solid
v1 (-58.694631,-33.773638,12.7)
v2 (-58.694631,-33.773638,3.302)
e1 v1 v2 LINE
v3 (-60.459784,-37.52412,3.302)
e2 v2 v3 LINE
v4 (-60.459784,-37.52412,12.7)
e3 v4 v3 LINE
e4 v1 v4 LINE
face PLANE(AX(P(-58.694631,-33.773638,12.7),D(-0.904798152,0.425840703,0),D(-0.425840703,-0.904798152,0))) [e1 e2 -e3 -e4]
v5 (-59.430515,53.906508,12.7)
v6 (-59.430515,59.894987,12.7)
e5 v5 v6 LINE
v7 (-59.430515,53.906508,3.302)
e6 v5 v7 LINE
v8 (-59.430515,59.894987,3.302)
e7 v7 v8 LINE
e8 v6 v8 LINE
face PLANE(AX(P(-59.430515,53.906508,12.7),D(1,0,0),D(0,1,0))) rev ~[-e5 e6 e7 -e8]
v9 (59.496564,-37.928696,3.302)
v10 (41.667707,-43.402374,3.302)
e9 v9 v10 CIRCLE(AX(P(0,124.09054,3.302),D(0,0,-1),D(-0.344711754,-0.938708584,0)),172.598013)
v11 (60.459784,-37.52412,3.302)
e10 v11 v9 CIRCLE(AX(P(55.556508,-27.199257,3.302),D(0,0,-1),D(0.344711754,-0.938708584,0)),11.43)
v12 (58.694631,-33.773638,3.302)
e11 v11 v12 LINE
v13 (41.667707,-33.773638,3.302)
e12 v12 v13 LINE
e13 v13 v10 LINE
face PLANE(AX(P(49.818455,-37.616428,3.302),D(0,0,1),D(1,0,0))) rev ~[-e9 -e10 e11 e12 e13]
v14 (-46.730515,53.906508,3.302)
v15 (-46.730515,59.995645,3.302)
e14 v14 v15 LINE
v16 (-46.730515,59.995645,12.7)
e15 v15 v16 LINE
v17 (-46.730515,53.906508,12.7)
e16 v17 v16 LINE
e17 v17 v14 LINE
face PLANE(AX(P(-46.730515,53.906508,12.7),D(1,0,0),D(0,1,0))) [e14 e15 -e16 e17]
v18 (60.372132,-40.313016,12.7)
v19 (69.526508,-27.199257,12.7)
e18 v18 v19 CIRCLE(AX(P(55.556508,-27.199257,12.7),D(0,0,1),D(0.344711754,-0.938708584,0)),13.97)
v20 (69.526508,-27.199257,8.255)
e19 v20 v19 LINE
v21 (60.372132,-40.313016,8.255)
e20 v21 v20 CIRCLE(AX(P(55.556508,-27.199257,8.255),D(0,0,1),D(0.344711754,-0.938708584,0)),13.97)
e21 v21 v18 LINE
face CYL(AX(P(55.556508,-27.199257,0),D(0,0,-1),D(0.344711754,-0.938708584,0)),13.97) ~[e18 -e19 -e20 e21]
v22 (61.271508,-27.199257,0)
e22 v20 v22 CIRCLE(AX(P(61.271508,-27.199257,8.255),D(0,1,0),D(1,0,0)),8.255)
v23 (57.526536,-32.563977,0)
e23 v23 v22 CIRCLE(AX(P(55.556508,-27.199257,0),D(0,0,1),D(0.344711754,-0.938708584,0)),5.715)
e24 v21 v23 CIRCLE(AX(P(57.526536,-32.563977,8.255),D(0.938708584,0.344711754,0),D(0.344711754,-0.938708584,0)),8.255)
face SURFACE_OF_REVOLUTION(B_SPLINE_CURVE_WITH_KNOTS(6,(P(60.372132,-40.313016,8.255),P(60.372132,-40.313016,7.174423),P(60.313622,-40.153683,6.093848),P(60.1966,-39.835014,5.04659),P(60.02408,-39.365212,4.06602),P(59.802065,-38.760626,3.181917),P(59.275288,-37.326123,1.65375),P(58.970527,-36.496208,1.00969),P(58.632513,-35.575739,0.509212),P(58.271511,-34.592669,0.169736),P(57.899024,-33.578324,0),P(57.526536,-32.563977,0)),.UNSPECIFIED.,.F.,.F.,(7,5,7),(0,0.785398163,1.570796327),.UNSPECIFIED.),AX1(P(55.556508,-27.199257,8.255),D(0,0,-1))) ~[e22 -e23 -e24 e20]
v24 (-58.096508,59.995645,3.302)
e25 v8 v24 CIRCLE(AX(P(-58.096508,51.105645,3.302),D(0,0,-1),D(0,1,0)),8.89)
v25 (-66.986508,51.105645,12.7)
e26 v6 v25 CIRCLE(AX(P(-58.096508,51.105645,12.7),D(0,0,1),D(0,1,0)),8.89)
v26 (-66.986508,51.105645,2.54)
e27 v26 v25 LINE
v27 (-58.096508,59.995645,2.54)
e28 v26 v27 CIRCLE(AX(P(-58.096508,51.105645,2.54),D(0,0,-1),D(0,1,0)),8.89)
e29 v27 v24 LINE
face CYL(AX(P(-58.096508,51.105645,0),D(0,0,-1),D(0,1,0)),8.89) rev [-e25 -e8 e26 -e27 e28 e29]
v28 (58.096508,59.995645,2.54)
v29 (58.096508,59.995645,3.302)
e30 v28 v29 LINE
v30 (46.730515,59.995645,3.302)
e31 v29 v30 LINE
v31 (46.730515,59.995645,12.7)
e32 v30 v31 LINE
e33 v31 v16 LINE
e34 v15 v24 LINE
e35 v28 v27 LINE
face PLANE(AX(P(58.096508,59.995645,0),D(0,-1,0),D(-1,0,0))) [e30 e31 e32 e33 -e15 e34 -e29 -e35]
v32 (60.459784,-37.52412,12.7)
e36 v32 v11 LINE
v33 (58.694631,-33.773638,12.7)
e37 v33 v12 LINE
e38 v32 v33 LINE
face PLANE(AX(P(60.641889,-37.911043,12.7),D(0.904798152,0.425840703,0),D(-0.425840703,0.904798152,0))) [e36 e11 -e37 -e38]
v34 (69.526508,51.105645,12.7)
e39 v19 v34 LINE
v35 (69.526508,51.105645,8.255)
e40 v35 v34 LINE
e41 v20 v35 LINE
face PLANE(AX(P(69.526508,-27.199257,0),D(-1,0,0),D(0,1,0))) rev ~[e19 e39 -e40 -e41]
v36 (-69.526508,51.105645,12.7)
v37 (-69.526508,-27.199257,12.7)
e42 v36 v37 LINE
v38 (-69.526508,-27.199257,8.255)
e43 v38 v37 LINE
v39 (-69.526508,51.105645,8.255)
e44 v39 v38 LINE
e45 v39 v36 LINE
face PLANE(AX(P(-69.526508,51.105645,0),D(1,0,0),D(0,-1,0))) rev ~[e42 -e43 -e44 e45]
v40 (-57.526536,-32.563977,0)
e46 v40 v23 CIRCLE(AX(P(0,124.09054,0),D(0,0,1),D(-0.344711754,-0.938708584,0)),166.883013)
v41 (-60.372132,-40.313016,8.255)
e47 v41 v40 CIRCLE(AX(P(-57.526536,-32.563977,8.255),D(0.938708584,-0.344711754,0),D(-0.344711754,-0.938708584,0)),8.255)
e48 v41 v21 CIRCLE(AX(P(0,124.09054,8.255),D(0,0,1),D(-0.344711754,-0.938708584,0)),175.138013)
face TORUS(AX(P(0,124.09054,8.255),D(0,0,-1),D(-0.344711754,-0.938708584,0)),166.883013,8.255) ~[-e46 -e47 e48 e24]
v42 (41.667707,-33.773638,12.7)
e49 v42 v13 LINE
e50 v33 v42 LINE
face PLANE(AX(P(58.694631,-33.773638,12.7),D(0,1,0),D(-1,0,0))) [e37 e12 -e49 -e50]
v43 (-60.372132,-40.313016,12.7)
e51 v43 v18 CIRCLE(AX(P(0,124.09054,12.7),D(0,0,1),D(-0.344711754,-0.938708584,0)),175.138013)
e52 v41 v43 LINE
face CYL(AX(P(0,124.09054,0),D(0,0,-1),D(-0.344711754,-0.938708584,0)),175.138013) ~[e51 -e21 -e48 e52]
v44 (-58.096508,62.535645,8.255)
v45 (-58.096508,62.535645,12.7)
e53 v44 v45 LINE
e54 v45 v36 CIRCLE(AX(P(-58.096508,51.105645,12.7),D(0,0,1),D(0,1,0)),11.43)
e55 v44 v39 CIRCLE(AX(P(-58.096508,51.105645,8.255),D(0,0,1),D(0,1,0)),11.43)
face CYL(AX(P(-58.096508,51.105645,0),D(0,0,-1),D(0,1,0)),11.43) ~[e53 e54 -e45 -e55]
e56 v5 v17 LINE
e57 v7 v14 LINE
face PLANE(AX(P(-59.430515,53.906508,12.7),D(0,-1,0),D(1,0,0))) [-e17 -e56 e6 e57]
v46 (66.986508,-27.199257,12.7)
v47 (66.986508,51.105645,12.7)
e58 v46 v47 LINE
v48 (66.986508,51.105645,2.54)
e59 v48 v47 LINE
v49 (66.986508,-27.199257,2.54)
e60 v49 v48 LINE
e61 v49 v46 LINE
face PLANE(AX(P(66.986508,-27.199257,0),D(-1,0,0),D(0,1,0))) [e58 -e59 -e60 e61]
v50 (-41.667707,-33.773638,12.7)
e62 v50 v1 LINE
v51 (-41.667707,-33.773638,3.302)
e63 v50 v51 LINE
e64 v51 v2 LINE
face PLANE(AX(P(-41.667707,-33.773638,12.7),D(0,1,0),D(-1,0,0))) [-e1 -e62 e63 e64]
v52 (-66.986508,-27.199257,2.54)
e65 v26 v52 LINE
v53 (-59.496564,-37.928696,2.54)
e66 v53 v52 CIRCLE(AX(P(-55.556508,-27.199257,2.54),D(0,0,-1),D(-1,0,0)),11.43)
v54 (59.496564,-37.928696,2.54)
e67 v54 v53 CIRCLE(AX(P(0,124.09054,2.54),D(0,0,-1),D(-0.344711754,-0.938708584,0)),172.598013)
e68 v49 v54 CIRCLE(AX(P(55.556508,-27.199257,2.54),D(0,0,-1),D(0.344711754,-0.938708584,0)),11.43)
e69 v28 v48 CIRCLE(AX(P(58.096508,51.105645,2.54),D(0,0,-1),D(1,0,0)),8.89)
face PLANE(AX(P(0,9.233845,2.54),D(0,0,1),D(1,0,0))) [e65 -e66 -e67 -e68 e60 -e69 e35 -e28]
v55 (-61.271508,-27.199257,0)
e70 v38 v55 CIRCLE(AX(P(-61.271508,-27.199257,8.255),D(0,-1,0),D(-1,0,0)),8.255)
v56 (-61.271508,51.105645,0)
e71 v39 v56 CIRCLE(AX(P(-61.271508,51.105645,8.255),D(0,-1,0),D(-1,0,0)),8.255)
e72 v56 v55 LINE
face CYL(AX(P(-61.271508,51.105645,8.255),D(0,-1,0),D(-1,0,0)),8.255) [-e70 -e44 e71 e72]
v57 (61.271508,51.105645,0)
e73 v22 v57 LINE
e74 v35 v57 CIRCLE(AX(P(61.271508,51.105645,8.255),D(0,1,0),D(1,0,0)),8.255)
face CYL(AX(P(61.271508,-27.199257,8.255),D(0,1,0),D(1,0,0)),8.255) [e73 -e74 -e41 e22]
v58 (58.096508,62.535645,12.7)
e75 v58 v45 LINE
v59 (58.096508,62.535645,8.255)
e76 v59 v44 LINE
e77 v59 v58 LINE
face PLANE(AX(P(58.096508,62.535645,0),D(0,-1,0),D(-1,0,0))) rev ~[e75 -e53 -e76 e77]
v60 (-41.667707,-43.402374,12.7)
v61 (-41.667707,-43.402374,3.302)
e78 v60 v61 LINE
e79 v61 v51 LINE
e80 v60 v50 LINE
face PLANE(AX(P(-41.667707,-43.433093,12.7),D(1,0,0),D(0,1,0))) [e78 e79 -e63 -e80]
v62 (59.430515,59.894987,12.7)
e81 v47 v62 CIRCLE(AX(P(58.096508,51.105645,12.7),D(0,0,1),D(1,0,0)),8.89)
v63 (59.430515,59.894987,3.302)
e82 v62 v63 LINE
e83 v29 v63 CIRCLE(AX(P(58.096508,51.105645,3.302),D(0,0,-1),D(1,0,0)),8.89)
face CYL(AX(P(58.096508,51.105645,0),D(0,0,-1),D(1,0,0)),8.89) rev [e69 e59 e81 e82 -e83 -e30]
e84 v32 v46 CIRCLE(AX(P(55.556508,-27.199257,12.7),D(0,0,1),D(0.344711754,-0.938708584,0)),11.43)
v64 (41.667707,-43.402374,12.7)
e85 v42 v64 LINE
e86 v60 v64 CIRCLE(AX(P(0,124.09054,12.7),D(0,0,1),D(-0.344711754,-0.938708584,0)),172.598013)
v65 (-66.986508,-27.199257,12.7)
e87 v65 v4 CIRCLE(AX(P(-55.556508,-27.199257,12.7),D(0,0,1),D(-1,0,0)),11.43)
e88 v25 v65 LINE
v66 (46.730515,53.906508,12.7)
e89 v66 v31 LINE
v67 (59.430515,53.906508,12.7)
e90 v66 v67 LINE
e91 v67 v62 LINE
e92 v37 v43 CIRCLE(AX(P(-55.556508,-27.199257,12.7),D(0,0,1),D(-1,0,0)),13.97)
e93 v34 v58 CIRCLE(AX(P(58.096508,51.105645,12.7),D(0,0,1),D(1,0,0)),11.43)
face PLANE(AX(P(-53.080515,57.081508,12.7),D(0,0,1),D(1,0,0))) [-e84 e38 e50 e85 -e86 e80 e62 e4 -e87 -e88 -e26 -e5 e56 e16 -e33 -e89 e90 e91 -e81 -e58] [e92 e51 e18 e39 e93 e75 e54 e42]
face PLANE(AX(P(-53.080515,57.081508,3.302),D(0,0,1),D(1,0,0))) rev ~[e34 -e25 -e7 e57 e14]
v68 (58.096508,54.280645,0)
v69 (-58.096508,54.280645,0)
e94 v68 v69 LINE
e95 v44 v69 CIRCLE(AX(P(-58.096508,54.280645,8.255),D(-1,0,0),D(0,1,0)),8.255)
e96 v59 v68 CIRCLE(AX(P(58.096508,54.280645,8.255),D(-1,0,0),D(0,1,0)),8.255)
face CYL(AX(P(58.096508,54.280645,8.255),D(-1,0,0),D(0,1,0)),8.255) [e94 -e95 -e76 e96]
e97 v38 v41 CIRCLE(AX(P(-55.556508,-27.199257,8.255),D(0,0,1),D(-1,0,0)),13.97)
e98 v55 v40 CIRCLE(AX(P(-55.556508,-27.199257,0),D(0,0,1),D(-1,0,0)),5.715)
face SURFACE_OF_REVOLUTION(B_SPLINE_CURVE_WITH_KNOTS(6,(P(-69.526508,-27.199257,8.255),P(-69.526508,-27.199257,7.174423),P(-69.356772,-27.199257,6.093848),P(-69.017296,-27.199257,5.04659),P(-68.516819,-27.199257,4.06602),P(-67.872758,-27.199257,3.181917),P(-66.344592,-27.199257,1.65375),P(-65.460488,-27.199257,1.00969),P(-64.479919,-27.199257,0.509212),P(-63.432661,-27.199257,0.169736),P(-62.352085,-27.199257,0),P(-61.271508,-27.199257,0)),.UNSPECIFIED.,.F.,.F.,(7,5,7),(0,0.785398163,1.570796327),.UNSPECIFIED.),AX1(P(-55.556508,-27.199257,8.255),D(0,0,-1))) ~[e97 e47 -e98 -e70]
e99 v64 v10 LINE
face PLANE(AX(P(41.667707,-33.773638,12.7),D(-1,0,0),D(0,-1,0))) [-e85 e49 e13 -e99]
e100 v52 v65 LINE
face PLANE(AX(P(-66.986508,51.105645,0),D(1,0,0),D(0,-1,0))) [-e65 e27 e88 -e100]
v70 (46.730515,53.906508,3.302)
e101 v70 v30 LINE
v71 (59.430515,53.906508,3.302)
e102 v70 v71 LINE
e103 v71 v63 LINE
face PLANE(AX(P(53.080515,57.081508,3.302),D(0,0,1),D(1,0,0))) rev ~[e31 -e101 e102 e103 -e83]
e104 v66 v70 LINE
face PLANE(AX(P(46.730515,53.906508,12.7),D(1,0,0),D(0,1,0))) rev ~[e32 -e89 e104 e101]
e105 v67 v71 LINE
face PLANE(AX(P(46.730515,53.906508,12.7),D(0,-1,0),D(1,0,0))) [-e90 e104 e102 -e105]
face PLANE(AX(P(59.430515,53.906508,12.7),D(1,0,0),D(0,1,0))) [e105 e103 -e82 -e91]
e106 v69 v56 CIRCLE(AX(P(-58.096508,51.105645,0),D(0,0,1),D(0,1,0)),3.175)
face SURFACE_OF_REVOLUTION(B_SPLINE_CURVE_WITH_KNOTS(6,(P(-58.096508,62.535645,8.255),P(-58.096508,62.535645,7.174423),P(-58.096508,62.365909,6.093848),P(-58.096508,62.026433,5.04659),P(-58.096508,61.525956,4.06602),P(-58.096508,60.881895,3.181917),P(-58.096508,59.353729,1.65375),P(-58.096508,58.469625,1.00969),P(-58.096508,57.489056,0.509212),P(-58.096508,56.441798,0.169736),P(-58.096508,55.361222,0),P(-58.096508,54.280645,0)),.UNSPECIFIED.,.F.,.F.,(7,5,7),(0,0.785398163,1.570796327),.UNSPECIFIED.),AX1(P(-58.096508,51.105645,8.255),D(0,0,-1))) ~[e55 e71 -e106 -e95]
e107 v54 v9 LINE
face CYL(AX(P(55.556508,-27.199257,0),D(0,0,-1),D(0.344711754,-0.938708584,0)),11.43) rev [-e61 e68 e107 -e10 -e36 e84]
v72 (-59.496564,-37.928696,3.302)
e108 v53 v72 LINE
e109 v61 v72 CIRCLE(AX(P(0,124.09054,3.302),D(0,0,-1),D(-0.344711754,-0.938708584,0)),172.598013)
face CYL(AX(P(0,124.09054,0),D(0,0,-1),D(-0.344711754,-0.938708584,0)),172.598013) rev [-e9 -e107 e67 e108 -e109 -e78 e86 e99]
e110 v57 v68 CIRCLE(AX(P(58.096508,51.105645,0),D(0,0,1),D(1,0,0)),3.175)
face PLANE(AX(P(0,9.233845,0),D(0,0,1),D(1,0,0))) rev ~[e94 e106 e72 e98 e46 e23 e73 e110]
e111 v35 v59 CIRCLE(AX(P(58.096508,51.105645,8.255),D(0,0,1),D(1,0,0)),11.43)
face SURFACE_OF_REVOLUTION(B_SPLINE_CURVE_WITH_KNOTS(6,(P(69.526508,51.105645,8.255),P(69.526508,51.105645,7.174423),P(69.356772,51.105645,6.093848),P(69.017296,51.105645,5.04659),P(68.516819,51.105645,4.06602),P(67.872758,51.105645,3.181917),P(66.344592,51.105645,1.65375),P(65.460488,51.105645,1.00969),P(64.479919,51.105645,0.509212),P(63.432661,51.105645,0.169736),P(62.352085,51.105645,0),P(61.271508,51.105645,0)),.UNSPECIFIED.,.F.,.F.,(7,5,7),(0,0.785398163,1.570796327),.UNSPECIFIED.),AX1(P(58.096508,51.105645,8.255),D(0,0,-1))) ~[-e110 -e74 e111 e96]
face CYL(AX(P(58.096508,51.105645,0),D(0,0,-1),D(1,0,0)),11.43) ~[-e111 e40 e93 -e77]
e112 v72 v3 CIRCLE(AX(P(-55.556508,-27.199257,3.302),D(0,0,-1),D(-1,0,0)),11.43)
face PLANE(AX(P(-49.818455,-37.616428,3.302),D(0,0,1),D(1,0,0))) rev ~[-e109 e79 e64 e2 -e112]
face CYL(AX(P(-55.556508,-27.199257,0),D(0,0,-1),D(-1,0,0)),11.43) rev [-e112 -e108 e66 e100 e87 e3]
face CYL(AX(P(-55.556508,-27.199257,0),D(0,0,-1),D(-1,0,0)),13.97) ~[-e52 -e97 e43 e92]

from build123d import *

# Parameters (mm, degrees)
F1_DEPTH = 12.7
F2_T     = -2.54
F3_R     = 8.255
F5_W     = 12.7
F5_H     = 6.35
F6_DEPTH = 9.398


# Not quite as in the source:
# - a feature names something its author has since deleted; it is built from what else it names


with BuildPart() as f1:
    # F0 (on Top) → F1 (new body)
    with BuildSketch(Plane.XY):
        with BuildLine():
            Line((58.0965084505, 62.5356453779), (-58.0965084505, 62.5356453779))
            ThreePointArc((-58.0965084505, 62.5356453779), (-66.1787389595, 59.1878758868), (-69.5265084505, 51.1056453779))
            Line((-69.5265084505, 51.1056453779), (-69.5265084505, -27.1992570698))
            ThreePointArc((-69.5265084505, -27.1992570698), (-67.0115325937, -35.1957139026), (-60.3721316603, -40.3130159932))
            ThreePointArc((-60.3721316603, -40.3130159932), (0, -51.0474727306), (60.3721316603, -40.3130159932))
            ThreePointArc((60.3721316603, -40.3130159932), (67.0115325937, -35.1957139026), (69.5265084505, -27.1992570698))
            Line((69.5265084505, -27.1992570698), (69.5265084505, 51.1056453779))
            ThreePointArc((69.5265084505, 51.1056453779), (66.1787389595, 59.1878758868), (58.0965084505, 62.5356453779))
        make_face()
    extrude(amount=F1_DEPTH)

    # F2
    f2_openings = [f1.faces().sort_by_distance(p)[0] for p in [
        (0, 7.919531, 12.7),
    ]]
    offset(amount=F2_T, openings=f2_openings)

    # F3
    f3_edges = [f1.edges().sort_by_distance(p)[0] for p in [
        (69.526508, 11.953194, 0),
        (66.178739, 59.187876, 0),
        (0, 62.535645, 0),
        (-66.178739, 59.187876, 0),
        (-69.526508, 11.953194, 0),
        (-67.011533, -35.195714, 0),
        (0, -51.047473, 0),
        (67.011533, -35.195714, 0),
    ]]
    fillet(f3_edges, radius=F3_R)

    # F5 (on offset) → F6 (join)
    with BuildSketch(Plane.XY.offset(12.7)):
        with Locations((-53.0805146158, 57.0815077901)):
            Rectangle(F5_W, F5_H)
        with Locations((53.0805146158, 57.0815077901)):
            Rectangle(F5_W, F5_H)
        Polygon((-41.6677072644, -33.773638308), (-58.6946308613, -33.773638308), (-60.6418885291, -37.9110425711), (-53.9016760886, -40.266495198), (-41.6677072644, -43.4330925345), align=None)
        Polygon((60.6418885291, -37.9110425711), (58.6946308613, -33.773638308), (41.6677072644, -33.773638308), (41.6677072644, -43.4330925345), (53.9016760886, -40.266495198), align=None)
    extrude(amount=-F6_DEPTH)


solid = f1.part
